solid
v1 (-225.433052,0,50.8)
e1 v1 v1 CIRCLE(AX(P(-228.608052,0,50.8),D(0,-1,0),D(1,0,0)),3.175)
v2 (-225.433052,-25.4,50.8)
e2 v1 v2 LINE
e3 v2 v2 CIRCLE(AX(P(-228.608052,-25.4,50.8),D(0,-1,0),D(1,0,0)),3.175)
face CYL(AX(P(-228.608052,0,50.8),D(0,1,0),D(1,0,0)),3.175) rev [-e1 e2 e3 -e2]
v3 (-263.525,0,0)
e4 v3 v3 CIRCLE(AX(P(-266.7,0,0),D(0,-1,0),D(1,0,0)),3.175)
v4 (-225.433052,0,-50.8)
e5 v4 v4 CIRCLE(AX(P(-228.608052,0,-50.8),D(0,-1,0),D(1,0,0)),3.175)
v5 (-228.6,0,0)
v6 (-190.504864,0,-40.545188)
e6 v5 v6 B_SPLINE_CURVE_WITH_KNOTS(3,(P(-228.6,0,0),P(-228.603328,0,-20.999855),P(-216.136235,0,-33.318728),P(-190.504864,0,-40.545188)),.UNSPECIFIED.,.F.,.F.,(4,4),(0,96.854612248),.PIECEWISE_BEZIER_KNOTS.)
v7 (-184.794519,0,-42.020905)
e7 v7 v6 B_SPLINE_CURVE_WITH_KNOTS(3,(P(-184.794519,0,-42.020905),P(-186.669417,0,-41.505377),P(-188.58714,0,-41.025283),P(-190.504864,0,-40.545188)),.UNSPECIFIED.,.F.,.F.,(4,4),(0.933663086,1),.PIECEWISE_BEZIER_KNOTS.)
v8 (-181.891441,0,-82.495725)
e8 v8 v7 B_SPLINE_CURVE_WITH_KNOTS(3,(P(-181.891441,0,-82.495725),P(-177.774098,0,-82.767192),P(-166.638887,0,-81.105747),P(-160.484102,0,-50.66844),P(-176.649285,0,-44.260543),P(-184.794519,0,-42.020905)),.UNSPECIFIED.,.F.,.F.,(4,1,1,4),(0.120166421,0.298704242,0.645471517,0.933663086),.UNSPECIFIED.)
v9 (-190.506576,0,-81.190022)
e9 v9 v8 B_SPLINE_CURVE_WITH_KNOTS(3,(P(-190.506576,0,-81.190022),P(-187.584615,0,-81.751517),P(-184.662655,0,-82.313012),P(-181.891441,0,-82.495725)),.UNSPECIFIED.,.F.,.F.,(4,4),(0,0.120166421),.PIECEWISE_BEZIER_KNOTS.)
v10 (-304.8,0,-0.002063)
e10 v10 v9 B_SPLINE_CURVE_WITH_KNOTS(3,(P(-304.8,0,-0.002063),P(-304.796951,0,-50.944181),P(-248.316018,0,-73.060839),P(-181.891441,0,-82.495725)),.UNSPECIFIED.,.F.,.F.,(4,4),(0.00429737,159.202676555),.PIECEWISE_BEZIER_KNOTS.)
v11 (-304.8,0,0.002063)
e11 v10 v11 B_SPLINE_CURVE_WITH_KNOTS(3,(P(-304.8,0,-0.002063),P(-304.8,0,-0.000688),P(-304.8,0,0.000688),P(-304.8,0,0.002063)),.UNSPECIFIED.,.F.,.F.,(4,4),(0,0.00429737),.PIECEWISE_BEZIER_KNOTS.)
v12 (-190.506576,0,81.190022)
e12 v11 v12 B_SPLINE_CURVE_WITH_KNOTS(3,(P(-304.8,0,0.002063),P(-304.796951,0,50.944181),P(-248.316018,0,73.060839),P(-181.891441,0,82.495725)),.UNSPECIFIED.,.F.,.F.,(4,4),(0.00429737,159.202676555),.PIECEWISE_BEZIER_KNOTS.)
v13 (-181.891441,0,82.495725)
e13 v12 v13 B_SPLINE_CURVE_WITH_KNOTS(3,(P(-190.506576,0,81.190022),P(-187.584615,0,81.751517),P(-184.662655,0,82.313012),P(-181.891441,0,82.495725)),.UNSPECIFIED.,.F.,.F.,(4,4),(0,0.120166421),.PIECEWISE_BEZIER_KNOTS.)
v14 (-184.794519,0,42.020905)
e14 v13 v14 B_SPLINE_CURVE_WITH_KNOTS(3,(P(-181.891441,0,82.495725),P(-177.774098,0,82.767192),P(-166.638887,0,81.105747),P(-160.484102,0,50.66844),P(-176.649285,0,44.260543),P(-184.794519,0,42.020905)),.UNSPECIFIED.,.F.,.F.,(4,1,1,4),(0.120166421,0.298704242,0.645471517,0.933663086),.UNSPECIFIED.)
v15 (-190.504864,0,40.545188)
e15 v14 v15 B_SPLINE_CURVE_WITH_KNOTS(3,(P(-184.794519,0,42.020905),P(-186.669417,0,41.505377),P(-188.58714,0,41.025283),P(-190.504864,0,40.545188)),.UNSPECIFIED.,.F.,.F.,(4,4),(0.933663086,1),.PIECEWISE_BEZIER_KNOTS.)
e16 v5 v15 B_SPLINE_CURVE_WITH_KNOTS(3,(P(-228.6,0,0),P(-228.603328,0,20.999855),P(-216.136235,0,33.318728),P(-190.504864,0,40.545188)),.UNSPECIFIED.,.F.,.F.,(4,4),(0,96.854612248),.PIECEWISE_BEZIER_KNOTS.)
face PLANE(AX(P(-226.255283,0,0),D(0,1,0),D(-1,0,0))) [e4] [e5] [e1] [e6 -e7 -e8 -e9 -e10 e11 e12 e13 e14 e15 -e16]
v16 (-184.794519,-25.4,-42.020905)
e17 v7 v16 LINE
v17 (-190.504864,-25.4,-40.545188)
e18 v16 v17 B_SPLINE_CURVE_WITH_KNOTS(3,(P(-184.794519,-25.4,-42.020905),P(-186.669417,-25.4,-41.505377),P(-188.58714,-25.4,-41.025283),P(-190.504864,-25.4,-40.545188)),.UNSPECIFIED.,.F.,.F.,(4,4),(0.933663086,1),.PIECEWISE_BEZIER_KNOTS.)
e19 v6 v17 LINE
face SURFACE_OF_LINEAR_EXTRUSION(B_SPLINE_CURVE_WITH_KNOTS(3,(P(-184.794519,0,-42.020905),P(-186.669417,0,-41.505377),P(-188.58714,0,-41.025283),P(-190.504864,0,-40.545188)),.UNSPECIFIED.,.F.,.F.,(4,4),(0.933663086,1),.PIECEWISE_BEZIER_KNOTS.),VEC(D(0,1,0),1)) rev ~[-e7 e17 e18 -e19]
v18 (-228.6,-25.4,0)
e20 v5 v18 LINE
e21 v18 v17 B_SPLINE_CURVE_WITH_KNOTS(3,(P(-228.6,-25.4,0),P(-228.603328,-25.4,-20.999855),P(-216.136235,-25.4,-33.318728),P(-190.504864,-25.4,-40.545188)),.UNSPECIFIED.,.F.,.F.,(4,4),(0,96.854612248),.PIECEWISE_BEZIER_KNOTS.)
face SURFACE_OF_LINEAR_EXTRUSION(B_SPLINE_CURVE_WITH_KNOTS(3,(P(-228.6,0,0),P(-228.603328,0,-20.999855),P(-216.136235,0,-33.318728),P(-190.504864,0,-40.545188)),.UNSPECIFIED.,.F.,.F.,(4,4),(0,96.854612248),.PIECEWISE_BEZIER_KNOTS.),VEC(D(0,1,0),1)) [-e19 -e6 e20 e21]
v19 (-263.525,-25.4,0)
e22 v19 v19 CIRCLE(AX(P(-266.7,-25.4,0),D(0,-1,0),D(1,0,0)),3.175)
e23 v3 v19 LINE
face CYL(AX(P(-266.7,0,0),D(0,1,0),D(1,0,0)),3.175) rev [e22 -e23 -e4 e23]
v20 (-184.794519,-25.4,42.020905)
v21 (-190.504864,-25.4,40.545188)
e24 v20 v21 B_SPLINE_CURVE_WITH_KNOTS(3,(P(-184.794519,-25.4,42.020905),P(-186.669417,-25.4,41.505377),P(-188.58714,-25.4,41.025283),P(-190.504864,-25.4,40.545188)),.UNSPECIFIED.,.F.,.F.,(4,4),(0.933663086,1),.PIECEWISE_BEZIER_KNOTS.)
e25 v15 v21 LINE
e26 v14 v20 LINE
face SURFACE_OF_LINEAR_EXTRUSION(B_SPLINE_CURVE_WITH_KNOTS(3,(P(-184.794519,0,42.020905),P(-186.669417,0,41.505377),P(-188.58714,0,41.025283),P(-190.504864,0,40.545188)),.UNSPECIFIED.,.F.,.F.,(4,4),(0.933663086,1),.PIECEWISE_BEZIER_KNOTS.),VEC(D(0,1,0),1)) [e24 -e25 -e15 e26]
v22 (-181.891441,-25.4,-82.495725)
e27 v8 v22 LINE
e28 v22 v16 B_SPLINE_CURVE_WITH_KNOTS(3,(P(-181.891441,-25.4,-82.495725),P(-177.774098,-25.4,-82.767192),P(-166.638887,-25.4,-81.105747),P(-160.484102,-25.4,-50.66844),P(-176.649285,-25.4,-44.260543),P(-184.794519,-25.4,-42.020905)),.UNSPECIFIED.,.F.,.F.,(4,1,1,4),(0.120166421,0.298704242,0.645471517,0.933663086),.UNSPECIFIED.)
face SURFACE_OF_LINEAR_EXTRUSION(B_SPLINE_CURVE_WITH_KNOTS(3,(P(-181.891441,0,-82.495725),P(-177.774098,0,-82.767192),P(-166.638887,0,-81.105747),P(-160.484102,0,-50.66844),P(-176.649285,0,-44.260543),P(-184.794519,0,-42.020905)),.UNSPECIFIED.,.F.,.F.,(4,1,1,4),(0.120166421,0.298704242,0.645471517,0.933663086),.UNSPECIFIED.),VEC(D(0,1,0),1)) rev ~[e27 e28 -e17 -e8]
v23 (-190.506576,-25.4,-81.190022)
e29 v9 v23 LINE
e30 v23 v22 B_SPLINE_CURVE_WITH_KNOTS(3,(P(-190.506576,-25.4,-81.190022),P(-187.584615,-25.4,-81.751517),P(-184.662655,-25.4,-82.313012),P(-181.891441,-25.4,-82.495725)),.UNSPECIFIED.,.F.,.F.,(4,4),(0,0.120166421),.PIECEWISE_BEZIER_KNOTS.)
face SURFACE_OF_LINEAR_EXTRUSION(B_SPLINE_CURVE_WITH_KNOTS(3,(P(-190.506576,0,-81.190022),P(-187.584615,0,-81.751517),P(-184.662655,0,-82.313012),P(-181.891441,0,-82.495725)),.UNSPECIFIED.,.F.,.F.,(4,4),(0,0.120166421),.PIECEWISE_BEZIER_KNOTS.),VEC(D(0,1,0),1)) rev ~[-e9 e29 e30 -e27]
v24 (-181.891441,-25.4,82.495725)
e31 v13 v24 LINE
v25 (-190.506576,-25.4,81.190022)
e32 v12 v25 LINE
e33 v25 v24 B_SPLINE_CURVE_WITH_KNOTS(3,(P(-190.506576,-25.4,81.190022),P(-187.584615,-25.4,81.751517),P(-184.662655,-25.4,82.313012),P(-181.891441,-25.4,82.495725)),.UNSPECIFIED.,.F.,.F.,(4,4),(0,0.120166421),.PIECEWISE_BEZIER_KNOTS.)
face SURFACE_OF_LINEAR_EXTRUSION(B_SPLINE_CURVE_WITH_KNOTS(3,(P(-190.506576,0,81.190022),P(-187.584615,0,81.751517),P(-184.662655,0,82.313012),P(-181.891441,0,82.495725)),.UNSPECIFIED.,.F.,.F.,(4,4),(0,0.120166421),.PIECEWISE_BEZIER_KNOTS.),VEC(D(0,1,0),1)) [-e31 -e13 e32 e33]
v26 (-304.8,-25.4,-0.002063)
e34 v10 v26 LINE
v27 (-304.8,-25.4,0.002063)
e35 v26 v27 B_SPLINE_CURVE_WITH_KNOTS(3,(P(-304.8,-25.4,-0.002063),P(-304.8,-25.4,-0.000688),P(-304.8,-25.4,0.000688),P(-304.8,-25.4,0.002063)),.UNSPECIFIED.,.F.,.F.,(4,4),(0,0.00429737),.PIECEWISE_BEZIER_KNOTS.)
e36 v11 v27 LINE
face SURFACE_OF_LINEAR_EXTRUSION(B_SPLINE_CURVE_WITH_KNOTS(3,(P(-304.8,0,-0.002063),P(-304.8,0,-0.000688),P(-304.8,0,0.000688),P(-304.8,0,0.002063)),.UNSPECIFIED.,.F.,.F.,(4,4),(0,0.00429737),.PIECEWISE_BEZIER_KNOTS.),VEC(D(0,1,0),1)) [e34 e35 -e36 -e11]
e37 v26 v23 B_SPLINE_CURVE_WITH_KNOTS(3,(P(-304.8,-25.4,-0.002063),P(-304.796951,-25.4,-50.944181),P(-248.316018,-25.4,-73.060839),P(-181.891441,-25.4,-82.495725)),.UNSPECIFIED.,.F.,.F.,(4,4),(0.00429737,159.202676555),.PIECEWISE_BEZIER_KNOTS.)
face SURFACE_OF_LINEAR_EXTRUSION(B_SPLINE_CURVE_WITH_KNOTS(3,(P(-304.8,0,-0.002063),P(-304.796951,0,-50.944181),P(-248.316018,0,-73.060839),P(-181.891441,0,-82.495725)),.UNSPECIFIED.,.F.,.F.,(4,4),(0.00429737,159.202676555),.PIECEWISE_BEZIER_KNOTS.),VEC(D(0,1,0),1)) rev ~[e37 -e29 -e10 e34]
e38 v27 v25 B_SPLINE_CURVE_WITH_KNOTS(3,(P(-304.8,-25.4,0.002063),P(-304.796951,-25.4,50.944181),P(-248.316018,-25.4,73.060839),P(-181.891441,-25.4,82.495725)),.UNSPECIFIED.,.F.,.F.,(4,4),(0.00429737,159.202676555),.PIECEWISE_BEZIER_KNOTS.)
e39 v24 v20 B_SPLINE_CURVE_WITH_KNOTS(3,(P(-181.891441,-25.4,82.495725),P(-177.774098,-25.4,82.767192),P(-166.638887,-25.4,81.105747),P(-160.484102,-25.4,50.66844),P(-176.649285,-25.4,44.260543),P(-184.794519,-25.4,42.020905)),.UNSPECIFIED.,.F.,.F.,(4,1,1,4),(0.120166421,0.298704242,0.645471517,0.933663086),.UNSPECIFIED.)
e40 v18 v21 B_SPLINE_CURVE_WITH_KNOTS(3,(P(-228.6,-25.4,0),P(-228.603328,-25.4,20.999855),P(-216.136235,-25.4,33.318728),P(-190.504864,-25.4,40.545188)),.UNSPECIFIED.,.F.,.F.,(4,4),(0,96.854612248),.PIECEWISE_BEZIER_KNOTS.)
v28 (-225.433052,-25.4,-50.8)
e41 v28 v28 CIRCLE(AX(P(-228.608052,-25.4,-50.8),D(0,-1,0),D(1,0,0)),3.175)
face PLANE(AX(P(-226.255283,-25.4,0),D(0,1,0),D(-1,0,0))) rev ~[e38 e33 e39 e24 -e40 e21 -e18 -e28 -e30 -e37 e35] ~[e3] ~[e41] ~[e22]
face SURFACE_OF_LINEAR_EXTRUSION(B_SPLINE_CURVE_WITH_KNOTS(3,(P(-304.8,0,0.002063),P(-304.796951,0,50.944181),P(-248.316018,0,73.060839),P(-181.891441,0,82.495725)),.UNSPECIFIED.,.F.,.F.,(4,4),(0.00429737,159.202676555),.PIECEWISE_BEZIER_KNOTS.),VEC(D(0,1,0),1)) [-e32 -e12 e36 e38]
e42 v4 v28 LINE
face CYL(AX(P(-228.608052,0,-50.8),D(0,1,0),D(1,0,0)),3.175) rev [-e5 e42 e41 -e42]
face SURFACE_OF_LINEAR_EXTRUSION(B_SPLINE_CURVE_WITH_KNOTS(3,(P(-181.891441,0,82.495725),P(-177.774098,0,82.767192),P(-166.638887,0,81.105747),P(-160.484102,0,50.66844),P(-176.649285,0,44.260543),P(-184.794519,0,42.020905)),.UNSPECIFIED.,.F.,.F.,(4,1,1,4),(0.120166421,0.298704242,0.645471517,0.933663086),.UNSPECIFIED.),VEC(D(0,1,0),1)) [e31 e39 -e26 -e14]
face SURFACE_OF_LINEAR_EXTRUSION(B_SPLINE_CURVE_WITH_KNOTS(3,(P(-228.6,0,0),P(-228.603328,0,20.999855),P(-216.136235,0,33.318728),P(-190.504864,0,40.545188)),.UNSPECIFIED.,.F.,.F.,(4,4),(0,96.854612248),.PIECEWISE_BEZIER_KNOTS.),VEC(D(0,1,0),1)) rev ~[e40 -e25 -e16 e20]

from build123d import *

# Parameters (mm, degrees)
F0_R     = 3.175
F1_DEPTH = 25.4


# Not quite as in the source:
# - ends of sketch curves that miss each other by under 0.0002 mm in the source are joined


with BuildPart() as f1:
    # F0 (on Front) → F1 (new body)
    with BuildSketch(Plane.XZ):
        with BuildLine():
            add(Edge.make_bspline(
                [(-228.6, 0), (-228.603328408, -20.9998549914), (-216.1362353399, -33.3187275092), (-190.5048638582, -40.5451878905)],
                knots=[0, 0, 0, 0, 96.8546122477, 96.8546122477, 96.8546122477, 96.8546122477], degree=3))
            add(Edge.make_bspline(
                [(-228.6, 0), (-228.603328408, 20.9998549914), (-216.1362353399, 33.3187275092), (-190.5048638582, 40.5451878905)],
                knots=[0, 0, 0, 0, 96.8546122477, 96.8546122477, 96.8546122477, 96.8546122477], degree=3))
            add(Edge.make_bspline(
                [(-190.5048638582, 40.5451878905), (-188.6690340196, 41.0627782819), (-186.7656708429, 41.5542443707), (-184.7945193799, 42.0209047272)],
                knots=[96.8546122477, 96.8546122477, 96.8546122477, 96.8546122477, 103.7917590678, 103.7917590678, 103.7917590678, 103.7917590678], degree=3))
            add(Edge.make_bspline(
                [(-181.8914412177, 82.4957251162), (-177.7740978469, 82.7671917451), (-166.6388871368, 81.1057466034), (-160.4841015231, 50.6684396177), (-176.6492852244, 44.2605429862), (-184.7945193799, 42.0209047272)],
                knots=[0.1201664208, 0.1201664208, 0.1201664208, 0.1201664208, 0.2987042421, 0.6454715168, 0.9336630859, 0.9336630859, 0.9336630859, 0.9336630859], degree=3))
            add(Edge.make_bspline(
                [(-190.5065755272, 81.190021553), (-187.6562706797, 81.6501805926), (-184.7832793111, 82.0849710788), (-181.8914412177, 82.4957251162)],
                knots=[152.2718692701, 152.2718692701, 152.2718692701, 152.2718692701, 159.2026765547, 159.2026765547, 159.2026765547, 159.2026765547], degree=3))
            add(Edge.make_bspline(
                [(-304.7999998765, 0.0020627141), (-304.7970834826, 48.7263819663), (-253.1268418931, 71.0804777771), (-190.5065755272, 81.190021553)],
                knots=[0.0042973705, 0.0042973705, 0.0042973705, 0.0042973705, 152.2718692701, 152.2718692701, 152.2718692701, 152.2718692701], degree=3))
            add(Edge.make_bspline(
                [(-304.8, -0.0020627142), (-304.8, -0.0006875504), (-304.7999999588, 0.0006875924), (-304.7999998765, 0.0020627141)],
                knots=[0, 0, 0, 0, 0.0042973705, 0.0042973705, 0.0042973705, 0.0042973705], degree=3))
            add(Edge.make_bspline(
                [(-304.8, -0.0020627142), (-304.7970834826, -48.7263819663), (-253.1268418931, -71.0804777771), (-190.5065755272, -81.190021553)],
                knots=[0.0042973705, 0.0042973705, 0.0042973705, 0.0042973705, 152.2718692701, 152.2718692701, 152.2718692701, 152.2718692701], degree=3))
            add(Edge.make_bspline(
                [(-190.5065755272, -81.190021553), (-187.6562706797, -81.6501805926), (-184.7832793111, -82.0849710788), (-181.8914412177, -82.4957251162)],
                knots=[152.2718692701, 152.2718692701, 152.2718692701, 152.2718692701, 159.2026765547, 159.2026765547, 159.2026765547, 159.2026765547], degree=3))
            add(Edge.make_bspline(
                [(-181.8914412177, -82.4957251162), (-177.7740978469, -82.7671917451), (-166.6388871368, -81.1057466034), (-160.4841015231, -50.6684396177), (-176.6492852244, -44.2605429862), (-184.7945193799, -42.0209047272)],
                knots=[0.1201664208, 0.1201664208, 0.1201664208, 0.1201664208, 0.2987042421, 0.6454715168, 0.9336630859, 0.9336630859, 0.9336630859, 0.9336630859], degree=3))
            add(Edge.make_bspline(
                [(-190.5048638582, -40.5451878905), (-188.6690340196, -41.0627782819), (-186.7656708429, -41.5542443707), (-184.7945193799, -42.0209047272)],
                knots=[96.8546122477, 96.8546122477, 96.8546122477, 96.8546122477, 103.7917590678, 103.7917590678, 103.7917590678, 103.7917590678], degree=3))
        make_face()
        with Locations((-228.6080516329, -50.8)):
            Circle(F0_R, mode=Mode.SUBTRACT)
        with Locations((-266.7, 0)):
            Circle(F0_R, mode=Mode.SUBTRACT)
        with Locations((-228.6080516329, 50.8)):
            Circle(F0_R, mode=Mode.SUBTRACT)
        with BuildLine():
            add(Edge.make_bspline(
                [(-190.5048638582, 40.5451878905), (-188.6690340196, 41.0627782819), (-186.7656708429, 41.5542443707), (-184.7945193799, 42.0209047272)],
                knots=[96.8546122477, 96.8546122477, 96.8546122477, 96.8546122477, 103.7917590678, 103.7917590678, 103.7917590678, 103.7917590678], degree=3))
            add(Edge.make_bspline(
                [(-184.7945193799, 42.0209047272), (-186.6694170397, 41.5053771867), (-188.587140449, 41.0252825386), (-190.5048638582, 40.5451878905)],
                knots=[0.9336630859, 0.9336630859, 0.9336630859, 0.9336630859, 1, 1, 1, 1], degree=3))
        make_face()
        with BuildLine():
            add(Edge.make_bspline(
                [(-184.7945193799, -42.0209047272), (-186.6694170397, -41.5053771867), (-188.587140449, -41.0252825386), (-190.5048638582, -40.5451878905)],
                knots=[0.9336630859, 0.9336630859, 0.9336630859, 0.9336630859, 1, 1, 1, 1], degree=3))
            add(Edge.make_bspline(
                [(-190.5048638582, -40.5451878905), (-188.6690340196, -41.0627782819), (-186.7656708429, -41.5542443707), (-184.7945193799, -42.0209047272)],
                knots=[96.8546122477, 96.8546122477, 96.8546122477, 96.8546122477, 103.7917590678, 103.7917590678, 103.7917590678, 103.7917590678], degree=3))
        make_face()
        with BuildLine():
            add(Edge.make_bspline(
                [(-190.5065755272, 81.190021553), (-187.6562706797, 81.6501805926), (-184.7832793111, 82.0849710788), (-181.8914412177, 82.4957251162)],
                knots=[152.2718692701, 152.2718692701, 152.2718692701, 152.2718692701, 159.2026765547, 159.2026765547, 159.2026765547, 159.2026765547], degree=3))
            add(Edge.make_bspline(
                [(-190.5065755272, 81.190021553), (-187.58461511, 81.7515168563), (-184.6626546928, 82.3130121597), (-181.8914412177, 82.4957251162)],
                knots=[0, 0, 0, 0, 0.1201664208, 0.1201664208, 0.1201664208, 0.1201664208], degree=3))
        make_face()
        with BuildLine():
            add(Edge.make_bspline(
                [(-190.5065755272, -81.190021553), (-187.58461511, -81.7515168563), (-184.6626546928, -82.3130121597), (-181.8914412177, -82.4957251162)],
                knots=[0, 0, 0, 0, 0.1201664208, 0.1201664208, 0.1201664208, 0.1201664208], degree=3))
            add(Edge.make_bspline(
                [(-190.5065755272, -81.190021553), (-187.6562706797, -81.6501805926), (-184.7832793111, -82.0849710788), (-181.8914412177, -82.4957251162)],
                knots=[152.2718692701, 152.2718692701, 152.2718692701, 152.2718692701, 159.2026765547, 159.2026765547, 159.2026765547, 159.2026765547], degree=3))
        make_face()
    extrude(amount=F1_DEPTH)


solid = f1.part
